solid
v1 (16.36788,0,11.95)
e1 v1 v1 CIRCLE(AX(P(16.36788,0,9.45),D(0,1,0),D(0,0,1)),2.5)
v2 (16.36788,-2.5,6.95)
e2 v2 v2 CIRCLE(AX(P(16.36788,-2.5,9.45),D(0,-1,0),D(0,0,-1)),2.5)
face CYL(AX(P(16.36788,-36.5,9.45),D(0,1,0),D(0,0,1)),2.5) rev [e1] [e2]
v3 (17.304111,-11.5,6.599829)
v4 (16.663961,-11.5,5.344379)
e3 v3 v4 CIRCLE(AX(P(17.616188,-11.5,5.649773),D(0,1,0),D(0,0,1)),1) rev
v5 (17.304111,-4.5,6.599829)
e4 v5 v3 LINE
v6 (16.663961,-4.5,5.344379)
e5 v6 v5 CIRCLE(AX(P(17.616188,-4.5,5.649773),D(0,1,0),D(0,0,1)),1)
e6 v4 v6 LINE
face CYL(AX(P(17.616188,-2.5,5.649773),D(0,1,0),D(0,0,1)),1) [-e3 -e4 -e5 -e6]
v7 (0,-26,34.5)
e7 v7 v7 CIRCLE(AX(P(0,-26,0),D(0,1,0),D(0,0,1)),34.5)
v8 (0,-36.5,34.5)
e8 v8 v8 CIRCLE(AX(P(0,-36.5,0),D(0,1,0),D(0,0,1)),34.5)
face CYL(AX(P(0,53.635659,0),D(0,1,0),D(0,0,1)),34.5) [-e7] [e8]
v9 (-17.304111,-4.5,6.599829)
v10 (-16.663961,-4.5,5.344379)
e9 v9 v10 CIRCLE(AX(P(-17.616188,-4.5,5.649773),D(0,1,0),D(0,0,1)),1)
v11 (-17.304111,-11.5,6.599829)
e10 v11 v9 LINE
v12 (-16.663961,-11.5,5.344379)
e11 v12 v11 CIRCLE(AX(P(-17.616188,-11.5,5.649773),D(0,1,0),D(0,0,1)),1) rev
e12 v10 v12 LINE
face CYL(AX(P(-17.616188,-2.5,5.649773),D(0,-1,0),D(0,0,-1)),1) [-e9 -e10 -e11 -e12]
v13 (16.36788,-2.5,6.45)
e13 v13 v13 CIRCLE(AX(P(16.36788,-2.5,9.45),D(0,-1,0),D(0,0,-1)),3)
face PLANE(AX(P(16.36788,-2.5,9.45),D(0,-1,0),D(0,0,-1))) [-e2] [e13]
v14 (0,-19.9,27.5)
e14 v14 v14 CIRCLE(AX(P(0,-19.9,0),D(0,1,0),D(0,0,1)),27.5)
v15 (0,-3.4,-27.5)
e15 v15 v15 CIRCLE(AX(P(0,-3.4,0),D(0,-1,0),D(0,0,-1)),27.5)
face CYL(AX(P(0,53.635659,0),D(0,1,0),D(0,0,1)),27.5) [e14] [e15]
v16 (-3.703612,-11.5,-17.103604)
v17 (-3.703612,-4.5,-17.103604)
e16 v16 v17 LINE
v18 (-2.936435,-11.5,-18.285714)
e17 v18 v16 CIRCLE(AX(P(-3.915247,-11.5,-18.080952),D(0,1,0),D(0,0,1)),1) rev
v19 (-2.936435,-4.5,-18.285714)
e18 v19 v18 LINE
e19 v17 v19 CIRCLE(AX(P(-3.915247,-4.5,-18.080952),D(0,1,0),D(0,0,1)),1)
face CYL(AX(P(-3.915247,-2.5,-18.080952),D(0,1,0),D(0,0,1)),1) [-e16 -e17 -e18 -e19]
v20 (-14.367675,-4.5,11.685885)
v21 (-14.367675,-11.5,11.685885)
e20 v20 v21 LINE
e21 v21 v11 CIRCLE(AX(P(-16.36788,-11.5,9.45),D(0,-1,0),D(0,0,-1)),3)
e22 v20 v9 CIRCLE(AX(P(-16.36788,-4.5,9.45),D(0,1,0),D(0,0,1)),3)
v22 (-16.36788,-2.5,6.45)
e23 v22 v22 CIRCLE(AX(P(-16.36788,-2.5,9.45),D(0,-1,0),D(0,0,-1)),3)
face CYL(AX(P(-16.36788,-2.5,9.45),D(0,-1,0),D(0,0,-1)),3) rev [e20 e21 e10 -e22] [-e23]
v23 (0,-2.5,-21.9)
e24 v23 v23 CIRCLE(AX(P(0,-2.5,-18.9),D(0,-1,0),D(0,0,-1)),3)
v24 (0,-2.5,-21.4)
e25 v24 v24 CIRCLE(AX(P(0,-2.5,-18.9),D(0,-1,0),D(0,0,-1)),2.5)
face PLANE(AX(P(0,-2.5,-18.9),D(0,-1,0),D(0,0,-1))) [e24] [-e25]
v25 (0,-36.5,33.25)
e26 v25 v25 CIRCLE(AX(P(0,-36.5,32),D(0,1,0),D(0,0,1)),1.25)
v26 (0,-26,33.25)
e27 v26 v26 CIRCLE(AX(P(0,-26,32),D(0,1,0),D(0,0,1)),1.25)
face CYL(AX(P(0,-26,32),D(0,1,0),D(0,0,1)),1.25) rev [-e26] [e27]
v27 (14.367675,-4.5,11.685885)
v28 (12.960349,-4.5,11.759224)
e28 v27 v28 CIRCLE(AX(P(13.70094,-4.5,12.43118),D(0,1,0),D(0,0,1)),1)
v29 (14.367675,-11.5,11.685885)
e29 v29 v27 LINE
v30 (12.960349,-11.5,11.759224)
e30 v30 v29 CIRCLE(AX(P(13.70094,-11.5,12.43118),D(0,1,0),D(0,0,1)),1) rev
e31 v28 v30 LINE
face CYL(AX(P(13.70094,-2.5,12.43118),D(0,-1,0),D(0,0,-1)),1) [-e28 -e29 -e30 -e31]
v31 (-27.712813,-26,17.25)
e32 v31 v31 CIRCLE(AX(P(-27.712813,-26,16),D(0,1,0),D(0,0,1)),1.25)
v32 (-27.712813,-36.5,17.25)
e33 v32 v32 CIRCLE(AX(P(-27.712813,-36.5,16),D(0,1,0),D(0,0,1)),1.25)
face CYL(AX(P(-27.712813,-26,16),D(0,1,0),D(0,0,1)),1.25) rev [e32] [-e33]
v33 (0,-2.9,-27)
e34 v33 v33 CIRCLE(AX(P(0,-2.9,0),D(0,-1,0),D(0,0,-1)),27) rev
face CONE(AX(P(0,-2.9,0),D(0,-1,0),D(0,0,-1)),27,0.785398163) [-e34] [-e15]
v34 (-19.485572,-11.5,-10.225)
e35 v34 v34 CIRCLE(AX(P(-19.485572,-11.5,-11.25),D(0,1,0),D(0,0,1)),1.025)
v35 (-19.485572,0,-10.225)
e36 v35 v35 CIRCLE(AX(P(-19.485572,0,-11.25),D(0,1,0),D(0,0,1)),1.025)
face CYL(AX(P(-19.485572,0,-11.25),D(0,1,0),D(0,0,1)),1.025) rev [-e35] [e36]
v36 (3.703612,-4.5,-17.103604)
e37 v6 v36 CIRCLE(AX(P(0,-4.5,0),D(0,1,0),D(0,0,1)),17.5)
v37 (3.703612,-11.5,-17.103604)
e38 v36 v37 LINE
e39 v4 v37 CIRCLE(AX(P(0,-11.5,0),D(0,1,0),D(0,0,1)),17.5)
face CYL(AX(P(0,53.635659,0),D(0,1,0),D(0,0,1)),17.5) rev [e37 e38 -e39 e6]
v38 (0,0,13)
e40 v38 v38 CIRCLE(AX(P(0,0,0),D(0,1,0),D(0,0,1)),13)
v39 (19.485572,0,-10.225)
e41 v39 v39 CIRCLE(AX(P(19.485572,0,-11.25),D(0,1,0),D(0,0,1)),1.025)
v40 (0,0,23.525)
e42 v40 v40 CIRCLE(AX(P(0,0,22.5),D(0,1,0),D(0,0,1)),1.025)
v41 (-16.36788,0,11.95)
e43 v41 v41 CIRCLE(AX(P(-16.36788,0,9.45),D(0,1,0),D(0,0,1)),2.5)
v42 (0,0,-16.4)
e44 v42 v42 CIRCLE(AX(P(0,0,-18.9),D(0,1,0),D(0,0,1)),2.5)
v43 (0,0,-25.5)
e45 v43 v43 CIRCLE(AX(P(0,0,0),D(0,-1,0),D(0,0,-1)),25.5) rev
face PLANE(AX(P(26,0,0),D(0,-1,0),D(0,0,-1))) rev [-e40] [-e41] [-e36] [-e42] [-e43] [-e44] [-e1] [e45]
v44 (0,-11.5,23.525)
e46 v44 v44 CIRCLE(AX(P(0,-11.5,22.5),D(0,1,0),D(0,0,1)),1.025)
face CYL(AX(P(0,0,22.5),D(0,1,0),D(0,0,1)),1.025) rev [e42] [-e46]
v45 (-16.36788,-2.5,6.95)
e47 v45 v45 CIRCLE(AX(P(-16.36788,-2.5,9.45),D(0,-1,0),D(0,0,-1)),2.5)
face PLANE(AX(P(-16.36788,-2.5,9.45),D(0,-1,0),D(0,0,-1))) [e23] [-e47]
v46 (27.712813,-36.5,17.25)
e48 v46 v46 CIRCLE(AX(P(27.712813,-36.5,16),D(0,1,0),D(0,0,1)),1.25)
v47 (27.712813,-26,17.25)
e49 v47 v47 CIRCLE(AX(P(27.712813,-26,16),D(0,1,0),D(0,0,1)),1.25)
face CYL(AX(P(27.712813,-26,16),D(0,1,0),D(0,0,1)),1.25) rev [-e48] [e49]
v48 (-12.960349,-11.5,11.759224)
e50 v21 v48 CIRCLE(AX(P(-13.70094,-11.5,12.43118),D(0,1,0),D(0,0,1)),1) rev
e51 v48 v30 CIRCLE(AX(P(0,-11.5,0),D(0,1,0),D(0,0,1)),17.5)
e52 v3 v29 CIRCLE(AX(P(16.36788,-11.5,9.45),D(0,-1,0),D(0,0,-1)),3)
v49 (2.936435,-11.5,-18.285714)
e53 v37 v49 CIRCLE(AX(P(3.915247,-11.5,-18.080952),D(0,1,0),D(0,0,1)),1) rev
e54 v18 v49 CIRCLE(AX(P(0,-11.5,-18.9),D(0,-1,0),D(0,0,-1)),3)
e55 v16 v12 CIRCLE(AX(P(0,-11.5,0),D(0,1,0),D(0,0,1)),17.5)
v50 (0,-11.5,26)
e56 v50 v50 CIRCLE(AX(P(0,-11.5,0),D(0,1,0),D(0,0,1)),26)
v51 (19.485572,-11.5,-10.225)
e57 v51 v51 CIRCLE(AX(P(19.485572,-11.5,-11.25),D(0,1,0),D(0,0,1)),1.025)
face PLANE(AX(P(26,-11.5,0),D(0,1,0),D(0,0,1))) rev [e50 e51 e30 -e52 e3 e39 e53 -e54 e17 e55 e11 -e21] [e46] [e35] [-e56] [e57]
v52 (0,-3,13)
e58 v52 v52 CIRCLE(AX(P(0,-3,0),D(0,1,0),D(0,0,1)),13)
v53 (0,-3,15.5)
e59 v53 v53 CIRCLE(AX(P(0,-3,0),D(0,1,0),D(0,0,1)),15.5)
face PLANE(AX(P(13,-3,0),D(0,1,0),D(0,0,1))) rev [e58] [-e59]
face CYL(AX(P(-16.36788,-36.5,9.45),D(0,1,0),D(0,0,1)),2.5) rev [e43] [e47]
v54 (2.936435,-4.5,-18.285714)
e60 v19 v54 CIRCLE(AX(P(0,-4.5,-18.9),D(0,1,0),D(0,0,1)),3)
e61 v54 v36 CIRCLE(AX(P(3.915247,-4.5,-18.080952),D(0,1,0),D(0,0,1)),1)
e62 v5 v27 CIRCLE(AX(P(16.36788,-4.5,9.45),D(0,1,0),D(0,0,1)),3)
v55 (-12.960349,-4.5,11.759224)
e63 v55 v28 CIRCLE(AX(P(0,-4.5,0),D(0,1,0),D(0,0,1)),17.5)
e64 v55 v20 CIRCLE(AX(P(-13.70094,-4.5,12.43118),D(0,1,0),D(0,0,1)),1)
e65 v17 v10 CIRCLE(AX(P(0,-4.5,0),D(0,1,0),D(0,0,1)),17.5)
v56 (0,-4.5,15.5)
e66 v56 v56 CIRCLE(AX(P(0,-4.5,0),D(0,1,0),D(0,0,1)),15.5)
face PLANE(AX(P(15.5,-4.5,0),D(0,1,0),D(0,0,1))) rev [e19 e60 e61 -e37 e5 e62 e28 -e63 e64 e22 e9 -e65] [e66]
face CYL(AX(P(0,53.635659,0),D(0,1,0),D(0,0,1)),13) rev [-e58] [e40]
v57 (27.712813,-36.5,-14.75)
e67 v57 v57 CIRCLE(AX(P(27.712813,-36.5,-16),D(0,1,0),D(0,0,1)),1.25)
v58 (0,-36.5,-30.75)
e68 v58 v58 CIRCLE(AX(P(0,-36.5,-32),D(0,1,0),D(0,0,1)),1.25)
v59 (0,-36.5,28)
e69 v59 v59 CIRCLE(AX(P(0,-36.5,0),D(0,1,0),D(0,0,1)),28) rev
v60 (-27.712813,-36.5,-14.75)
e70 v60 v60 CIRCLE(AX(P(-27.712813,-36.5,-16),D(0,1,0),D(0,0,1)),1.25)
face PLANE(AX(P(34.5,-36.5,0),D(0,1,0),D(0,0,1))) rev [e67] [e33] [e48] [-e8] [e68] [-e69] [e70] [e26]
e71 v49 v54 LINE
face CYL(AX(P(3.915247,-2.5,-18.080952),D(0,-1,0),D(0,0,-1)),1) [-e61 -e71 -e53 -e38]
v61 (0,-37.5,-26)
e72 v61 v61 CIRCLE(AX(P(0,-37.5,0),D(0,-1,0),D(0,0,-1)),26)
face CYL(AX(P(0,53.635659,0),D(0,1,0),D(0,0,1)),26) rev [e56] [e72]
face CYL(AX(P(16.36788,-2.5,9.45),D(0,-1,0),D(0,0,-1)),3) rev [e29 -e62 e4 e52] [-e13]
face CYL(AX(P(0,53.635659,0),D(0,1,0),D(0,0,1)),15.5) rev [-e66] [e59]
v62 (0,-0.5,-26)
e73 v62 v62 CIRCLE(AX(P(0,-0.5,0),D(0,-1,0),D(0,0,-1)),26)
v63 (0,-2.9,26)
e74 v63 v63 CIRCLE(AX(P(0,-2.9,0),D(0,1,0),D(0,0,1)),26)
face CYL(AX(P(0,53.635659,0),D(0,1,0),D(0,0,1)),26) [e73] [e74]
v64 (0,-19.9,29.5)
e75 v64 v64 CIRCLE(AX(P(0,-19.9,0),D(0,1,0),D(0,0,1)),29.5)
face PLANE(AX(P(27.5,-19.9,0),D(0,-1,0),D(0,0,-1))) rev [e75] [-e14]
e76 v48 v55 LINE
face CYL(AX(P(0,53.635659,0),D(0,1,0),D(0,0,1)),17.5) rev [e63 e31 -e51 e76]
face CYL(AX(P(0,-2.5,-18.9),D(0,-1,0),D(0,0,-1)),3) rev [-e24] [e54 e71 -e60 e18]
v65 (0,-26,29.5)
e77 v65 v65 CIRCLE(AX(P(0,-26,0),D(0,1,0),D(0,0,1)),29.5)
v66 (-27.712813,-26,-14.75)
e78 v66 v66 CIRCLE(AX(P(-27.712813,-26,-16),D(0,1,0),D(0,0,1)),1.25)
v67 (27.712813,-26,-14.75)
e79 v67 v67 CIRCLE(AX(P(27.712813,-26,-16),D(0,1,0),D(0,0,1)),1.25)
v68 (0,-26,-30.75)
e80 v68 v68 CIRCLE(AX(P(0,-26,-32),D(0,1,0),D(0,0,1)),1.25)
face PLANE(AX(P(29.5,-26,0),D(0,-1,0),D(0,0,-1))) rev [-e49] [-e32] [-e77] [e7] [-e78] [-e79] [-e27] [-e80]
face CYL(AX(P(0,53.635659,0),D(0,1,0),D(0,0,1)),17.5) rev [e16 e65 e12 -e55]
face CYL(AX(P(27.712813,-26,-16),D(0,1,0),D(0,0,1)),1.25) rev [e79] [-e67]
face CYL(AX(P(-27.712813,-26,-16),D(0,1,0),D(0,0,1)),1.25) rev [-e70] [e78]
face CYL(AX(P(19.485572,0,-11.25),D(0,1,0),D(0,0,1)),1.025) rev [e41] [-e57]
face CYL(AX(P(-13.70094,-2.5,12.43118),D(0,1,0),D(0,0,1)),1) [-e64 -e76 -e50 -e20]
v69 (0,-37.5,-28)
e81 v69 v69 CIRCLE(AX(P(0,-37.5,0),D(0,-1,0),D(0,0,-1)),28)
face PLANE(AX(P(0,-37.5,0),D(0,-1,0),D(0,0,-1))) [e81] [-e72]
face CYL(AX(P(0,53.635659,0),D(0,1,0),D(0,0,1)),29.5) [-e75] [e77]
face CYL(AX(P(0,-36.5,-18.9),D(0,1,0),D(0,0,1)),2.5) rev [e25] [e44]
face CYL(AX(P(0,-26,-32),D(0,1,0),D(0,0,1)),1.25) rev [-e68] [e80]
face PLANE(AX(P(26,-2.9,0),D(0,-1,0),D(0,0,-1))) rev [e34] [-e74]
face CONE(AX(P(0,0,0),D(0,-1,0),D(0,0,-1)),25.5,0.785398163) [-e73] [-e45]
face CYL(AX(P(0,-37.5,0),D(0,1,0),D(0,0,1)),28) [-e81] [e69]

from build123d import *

# Parameters (mm, degrees)
SKETCH_2_R               = 2.5
CUT_EXTRUDE_1_DEPTH      = 61.932339525
HOLE_WIZARD_M2_5_5_D     = 2.05
HOLE_WIZARD_M2_5_5_DEPTH = 18.35
HOLE_WIZARD_M2_5_5_TIP   = 0.615882135
CHAMFER_1_SIZE           = 0.5
CUT_EXTRUDE_START        = -9
SKETCH_20_R              = 3
SKETCH_20_R_2            = 2.5
CUT_EXTRUDE_6_DEPTH      = 9
HOLE_WIZARD_M3_2_D       = 2.5
HOLE_WIZARD_M3_2_DEPTH   = 18.5
HOLE_WIZARD_M3_2_TIP     = 0.751075774
SKETCH_25_R              = 28
SKETCH_25_R_2            = 26
EXTRUDE_1_DEPTH          = 1
FILLET_1_R               = 1


with BuildPart() as part:
    # 草图1 → 旋转1 (revolve)
    with BuildSketch(Plane.XY):
        Polygon((26, -11.5), (26, -36.5), (34.5, -36.5), (34.5, -26), (29.5, -26), (29.5, -19.9), (27.5, -19.9), (27.5, -2.9), (26, -2.9), (26, 0), (13, 0), (13, -3), (15.5, -3), (15.5, -4.5), (17.5, -4.5), (17.5, -11.5), align=None)
    revolve(axis=Axis((0, 53.635658915, 0), (0, -1, 0)))

    # 草图2 → 切除-拉伸1 (cut, through all)
    with BuildSketch(Plane(origin=(0, 0, 0), x_dir=(1, 0, 0), z_dir=(0, 1, 0))):
        with Locations((0, 18.9)):
            Circle(SKETCH_2_R)
        with Locations((-16.367880132, -9.45)):
            Circle(SKETCH_2_R)
        with Locations((16.367880132, -9.45)):
            Circle(SKETCH_2_R)
    extrude(amount=-CUT_EXTRUDE_1_DEPTH, mode=Mode.SUBTRACT)

    # M2.5 螺纹孔5
    with Locations(Plane(origin=(-19.485571585, 0, -11.25), x_dir=(0, 0, 1), z_dir=(0, 1, 0))):
        with Locations((0, 0), (0, 38.97114317), (33.75, 19.485571585)):
            Hole(HOLE_WIZARD_M2_5_5_D / 2, depth=HOLE_WIZARD_M2_5_5_DEPTH)
            with Locations((0, 0, -(HOLE_WIZARD_M2_5_5_DEPTH + HOLE_WIZARD_M2_5_5_TIP / 2))):  # 118° drill point
                Cone(0, HOLE_WIZARD_M2_5_5_D / 2, HOLE_WIZARD_M2_5_5_TIP, mode=Mode.SUBTRACT)

    # 倒角1
    chamfer_1_edges = [part.edges().sort_by_distance(p)[0] for p in [
        (-27.5, -2.9, 0),
        (-26, 0, 0),
    ]]
    chamfer(chamfer_1_edges, length=CHAMFER_1_SIZE)

    # 草图20 → 切除-拉伸6 (cut)
    # profile 1 of 3: a face of its own
    with BuildSketch(Plane.XZ.offset(11.5).offset(CUT_EXTRUDE_START)):
        with Locations((-16.367880132, 9.45)):
            Circle(SKETCH_20_R)
        with Locations((-16.367880132, 9.45)):
            Circle(SKETCH_20_R_2, mode=Mode.SUBTRACT)
    # profile 2 of 3: a face of its own
    with BuildSketch(Plane.XZ.offset(11.5).offset(CUT_EXTRUDE_START)):
        with Locations((16.367880132, 9.45)):
            Circle(SKETCH_20_R)
        with Locations((16.367880132, 9.45)):
            Circle(SKETCH_20_R_2, mode=Mode.SUBTRACT)
    # profile 3 of 3: a face of its own
    with BuildSketch(Plane.XZ.offset(11.5).offset(CUT_EXTRUDE_START)):
        with Locations((0, -18.9)):
            Circle(SKETCH_20_R)
        with Locations((0, -18.9)):
            Circle(SKETCH_20_R_2, mode=Mode.SUBTRACT)
    extrude(amount=CUT_EXTRUDE_6_DEPTH, mode=Mode.SUBTRACT)

    # M3 螺纹孔2
    with Locations(Plane(origin=(0, -26, 0), x_dir=(1, 0, 0), z_dir=(0, 1, 0))):
        with Locations((-27.712812921, 16), (-27.712812921, -16), (0, -32), (27.712812921, -16), (27.712812921, 16), (0, 32)):
            Hole(HOLE_WIZARD_M3_2_D / 2, depth=HOLE_WIZARD_M3_2_DEPTH)
            with Locations((0, 0, -(HOLE_WIZARD_M3_2_DEPTH + HOLE_WIZARD_M3_2_TIP / 2))):  # 118° drill point
                Cone(0, HOLE_WIZARD_M3_2_D / 2, HOLE_WIZARD_M3_2_TIP, mode=Mode.SUBTRACT)

    # 草图25 → 凸台-拉伸1 (add)
    with BuildSketch(Plane.XZ.offset(36.5)):
        Circle(SKETCH_25_R)
        Circle(SKETCH_25_R_2, mode=Mode.SUBTRACT)
    extrude(amount=EXTRUDE_1_DEPTH)

    # 圆角1
    fillet_1_edges = [part.edges().sort_by_distance(p)[0] for p in [
        (2.546336961, -8, -17.313756614),
        (-2.546336961, -8, -17.313756614),
        (13.720984582, -8, 10.862070802),
        (-13.720984582, -8, 10.862070802),
        (-16.267321543, -8, 6.451685812),
        (16.267321543, -8, 6.451685812),
    ]]
    fillet(fillet_1_edges, radius=FILLET_1_R)


solid = part.part
